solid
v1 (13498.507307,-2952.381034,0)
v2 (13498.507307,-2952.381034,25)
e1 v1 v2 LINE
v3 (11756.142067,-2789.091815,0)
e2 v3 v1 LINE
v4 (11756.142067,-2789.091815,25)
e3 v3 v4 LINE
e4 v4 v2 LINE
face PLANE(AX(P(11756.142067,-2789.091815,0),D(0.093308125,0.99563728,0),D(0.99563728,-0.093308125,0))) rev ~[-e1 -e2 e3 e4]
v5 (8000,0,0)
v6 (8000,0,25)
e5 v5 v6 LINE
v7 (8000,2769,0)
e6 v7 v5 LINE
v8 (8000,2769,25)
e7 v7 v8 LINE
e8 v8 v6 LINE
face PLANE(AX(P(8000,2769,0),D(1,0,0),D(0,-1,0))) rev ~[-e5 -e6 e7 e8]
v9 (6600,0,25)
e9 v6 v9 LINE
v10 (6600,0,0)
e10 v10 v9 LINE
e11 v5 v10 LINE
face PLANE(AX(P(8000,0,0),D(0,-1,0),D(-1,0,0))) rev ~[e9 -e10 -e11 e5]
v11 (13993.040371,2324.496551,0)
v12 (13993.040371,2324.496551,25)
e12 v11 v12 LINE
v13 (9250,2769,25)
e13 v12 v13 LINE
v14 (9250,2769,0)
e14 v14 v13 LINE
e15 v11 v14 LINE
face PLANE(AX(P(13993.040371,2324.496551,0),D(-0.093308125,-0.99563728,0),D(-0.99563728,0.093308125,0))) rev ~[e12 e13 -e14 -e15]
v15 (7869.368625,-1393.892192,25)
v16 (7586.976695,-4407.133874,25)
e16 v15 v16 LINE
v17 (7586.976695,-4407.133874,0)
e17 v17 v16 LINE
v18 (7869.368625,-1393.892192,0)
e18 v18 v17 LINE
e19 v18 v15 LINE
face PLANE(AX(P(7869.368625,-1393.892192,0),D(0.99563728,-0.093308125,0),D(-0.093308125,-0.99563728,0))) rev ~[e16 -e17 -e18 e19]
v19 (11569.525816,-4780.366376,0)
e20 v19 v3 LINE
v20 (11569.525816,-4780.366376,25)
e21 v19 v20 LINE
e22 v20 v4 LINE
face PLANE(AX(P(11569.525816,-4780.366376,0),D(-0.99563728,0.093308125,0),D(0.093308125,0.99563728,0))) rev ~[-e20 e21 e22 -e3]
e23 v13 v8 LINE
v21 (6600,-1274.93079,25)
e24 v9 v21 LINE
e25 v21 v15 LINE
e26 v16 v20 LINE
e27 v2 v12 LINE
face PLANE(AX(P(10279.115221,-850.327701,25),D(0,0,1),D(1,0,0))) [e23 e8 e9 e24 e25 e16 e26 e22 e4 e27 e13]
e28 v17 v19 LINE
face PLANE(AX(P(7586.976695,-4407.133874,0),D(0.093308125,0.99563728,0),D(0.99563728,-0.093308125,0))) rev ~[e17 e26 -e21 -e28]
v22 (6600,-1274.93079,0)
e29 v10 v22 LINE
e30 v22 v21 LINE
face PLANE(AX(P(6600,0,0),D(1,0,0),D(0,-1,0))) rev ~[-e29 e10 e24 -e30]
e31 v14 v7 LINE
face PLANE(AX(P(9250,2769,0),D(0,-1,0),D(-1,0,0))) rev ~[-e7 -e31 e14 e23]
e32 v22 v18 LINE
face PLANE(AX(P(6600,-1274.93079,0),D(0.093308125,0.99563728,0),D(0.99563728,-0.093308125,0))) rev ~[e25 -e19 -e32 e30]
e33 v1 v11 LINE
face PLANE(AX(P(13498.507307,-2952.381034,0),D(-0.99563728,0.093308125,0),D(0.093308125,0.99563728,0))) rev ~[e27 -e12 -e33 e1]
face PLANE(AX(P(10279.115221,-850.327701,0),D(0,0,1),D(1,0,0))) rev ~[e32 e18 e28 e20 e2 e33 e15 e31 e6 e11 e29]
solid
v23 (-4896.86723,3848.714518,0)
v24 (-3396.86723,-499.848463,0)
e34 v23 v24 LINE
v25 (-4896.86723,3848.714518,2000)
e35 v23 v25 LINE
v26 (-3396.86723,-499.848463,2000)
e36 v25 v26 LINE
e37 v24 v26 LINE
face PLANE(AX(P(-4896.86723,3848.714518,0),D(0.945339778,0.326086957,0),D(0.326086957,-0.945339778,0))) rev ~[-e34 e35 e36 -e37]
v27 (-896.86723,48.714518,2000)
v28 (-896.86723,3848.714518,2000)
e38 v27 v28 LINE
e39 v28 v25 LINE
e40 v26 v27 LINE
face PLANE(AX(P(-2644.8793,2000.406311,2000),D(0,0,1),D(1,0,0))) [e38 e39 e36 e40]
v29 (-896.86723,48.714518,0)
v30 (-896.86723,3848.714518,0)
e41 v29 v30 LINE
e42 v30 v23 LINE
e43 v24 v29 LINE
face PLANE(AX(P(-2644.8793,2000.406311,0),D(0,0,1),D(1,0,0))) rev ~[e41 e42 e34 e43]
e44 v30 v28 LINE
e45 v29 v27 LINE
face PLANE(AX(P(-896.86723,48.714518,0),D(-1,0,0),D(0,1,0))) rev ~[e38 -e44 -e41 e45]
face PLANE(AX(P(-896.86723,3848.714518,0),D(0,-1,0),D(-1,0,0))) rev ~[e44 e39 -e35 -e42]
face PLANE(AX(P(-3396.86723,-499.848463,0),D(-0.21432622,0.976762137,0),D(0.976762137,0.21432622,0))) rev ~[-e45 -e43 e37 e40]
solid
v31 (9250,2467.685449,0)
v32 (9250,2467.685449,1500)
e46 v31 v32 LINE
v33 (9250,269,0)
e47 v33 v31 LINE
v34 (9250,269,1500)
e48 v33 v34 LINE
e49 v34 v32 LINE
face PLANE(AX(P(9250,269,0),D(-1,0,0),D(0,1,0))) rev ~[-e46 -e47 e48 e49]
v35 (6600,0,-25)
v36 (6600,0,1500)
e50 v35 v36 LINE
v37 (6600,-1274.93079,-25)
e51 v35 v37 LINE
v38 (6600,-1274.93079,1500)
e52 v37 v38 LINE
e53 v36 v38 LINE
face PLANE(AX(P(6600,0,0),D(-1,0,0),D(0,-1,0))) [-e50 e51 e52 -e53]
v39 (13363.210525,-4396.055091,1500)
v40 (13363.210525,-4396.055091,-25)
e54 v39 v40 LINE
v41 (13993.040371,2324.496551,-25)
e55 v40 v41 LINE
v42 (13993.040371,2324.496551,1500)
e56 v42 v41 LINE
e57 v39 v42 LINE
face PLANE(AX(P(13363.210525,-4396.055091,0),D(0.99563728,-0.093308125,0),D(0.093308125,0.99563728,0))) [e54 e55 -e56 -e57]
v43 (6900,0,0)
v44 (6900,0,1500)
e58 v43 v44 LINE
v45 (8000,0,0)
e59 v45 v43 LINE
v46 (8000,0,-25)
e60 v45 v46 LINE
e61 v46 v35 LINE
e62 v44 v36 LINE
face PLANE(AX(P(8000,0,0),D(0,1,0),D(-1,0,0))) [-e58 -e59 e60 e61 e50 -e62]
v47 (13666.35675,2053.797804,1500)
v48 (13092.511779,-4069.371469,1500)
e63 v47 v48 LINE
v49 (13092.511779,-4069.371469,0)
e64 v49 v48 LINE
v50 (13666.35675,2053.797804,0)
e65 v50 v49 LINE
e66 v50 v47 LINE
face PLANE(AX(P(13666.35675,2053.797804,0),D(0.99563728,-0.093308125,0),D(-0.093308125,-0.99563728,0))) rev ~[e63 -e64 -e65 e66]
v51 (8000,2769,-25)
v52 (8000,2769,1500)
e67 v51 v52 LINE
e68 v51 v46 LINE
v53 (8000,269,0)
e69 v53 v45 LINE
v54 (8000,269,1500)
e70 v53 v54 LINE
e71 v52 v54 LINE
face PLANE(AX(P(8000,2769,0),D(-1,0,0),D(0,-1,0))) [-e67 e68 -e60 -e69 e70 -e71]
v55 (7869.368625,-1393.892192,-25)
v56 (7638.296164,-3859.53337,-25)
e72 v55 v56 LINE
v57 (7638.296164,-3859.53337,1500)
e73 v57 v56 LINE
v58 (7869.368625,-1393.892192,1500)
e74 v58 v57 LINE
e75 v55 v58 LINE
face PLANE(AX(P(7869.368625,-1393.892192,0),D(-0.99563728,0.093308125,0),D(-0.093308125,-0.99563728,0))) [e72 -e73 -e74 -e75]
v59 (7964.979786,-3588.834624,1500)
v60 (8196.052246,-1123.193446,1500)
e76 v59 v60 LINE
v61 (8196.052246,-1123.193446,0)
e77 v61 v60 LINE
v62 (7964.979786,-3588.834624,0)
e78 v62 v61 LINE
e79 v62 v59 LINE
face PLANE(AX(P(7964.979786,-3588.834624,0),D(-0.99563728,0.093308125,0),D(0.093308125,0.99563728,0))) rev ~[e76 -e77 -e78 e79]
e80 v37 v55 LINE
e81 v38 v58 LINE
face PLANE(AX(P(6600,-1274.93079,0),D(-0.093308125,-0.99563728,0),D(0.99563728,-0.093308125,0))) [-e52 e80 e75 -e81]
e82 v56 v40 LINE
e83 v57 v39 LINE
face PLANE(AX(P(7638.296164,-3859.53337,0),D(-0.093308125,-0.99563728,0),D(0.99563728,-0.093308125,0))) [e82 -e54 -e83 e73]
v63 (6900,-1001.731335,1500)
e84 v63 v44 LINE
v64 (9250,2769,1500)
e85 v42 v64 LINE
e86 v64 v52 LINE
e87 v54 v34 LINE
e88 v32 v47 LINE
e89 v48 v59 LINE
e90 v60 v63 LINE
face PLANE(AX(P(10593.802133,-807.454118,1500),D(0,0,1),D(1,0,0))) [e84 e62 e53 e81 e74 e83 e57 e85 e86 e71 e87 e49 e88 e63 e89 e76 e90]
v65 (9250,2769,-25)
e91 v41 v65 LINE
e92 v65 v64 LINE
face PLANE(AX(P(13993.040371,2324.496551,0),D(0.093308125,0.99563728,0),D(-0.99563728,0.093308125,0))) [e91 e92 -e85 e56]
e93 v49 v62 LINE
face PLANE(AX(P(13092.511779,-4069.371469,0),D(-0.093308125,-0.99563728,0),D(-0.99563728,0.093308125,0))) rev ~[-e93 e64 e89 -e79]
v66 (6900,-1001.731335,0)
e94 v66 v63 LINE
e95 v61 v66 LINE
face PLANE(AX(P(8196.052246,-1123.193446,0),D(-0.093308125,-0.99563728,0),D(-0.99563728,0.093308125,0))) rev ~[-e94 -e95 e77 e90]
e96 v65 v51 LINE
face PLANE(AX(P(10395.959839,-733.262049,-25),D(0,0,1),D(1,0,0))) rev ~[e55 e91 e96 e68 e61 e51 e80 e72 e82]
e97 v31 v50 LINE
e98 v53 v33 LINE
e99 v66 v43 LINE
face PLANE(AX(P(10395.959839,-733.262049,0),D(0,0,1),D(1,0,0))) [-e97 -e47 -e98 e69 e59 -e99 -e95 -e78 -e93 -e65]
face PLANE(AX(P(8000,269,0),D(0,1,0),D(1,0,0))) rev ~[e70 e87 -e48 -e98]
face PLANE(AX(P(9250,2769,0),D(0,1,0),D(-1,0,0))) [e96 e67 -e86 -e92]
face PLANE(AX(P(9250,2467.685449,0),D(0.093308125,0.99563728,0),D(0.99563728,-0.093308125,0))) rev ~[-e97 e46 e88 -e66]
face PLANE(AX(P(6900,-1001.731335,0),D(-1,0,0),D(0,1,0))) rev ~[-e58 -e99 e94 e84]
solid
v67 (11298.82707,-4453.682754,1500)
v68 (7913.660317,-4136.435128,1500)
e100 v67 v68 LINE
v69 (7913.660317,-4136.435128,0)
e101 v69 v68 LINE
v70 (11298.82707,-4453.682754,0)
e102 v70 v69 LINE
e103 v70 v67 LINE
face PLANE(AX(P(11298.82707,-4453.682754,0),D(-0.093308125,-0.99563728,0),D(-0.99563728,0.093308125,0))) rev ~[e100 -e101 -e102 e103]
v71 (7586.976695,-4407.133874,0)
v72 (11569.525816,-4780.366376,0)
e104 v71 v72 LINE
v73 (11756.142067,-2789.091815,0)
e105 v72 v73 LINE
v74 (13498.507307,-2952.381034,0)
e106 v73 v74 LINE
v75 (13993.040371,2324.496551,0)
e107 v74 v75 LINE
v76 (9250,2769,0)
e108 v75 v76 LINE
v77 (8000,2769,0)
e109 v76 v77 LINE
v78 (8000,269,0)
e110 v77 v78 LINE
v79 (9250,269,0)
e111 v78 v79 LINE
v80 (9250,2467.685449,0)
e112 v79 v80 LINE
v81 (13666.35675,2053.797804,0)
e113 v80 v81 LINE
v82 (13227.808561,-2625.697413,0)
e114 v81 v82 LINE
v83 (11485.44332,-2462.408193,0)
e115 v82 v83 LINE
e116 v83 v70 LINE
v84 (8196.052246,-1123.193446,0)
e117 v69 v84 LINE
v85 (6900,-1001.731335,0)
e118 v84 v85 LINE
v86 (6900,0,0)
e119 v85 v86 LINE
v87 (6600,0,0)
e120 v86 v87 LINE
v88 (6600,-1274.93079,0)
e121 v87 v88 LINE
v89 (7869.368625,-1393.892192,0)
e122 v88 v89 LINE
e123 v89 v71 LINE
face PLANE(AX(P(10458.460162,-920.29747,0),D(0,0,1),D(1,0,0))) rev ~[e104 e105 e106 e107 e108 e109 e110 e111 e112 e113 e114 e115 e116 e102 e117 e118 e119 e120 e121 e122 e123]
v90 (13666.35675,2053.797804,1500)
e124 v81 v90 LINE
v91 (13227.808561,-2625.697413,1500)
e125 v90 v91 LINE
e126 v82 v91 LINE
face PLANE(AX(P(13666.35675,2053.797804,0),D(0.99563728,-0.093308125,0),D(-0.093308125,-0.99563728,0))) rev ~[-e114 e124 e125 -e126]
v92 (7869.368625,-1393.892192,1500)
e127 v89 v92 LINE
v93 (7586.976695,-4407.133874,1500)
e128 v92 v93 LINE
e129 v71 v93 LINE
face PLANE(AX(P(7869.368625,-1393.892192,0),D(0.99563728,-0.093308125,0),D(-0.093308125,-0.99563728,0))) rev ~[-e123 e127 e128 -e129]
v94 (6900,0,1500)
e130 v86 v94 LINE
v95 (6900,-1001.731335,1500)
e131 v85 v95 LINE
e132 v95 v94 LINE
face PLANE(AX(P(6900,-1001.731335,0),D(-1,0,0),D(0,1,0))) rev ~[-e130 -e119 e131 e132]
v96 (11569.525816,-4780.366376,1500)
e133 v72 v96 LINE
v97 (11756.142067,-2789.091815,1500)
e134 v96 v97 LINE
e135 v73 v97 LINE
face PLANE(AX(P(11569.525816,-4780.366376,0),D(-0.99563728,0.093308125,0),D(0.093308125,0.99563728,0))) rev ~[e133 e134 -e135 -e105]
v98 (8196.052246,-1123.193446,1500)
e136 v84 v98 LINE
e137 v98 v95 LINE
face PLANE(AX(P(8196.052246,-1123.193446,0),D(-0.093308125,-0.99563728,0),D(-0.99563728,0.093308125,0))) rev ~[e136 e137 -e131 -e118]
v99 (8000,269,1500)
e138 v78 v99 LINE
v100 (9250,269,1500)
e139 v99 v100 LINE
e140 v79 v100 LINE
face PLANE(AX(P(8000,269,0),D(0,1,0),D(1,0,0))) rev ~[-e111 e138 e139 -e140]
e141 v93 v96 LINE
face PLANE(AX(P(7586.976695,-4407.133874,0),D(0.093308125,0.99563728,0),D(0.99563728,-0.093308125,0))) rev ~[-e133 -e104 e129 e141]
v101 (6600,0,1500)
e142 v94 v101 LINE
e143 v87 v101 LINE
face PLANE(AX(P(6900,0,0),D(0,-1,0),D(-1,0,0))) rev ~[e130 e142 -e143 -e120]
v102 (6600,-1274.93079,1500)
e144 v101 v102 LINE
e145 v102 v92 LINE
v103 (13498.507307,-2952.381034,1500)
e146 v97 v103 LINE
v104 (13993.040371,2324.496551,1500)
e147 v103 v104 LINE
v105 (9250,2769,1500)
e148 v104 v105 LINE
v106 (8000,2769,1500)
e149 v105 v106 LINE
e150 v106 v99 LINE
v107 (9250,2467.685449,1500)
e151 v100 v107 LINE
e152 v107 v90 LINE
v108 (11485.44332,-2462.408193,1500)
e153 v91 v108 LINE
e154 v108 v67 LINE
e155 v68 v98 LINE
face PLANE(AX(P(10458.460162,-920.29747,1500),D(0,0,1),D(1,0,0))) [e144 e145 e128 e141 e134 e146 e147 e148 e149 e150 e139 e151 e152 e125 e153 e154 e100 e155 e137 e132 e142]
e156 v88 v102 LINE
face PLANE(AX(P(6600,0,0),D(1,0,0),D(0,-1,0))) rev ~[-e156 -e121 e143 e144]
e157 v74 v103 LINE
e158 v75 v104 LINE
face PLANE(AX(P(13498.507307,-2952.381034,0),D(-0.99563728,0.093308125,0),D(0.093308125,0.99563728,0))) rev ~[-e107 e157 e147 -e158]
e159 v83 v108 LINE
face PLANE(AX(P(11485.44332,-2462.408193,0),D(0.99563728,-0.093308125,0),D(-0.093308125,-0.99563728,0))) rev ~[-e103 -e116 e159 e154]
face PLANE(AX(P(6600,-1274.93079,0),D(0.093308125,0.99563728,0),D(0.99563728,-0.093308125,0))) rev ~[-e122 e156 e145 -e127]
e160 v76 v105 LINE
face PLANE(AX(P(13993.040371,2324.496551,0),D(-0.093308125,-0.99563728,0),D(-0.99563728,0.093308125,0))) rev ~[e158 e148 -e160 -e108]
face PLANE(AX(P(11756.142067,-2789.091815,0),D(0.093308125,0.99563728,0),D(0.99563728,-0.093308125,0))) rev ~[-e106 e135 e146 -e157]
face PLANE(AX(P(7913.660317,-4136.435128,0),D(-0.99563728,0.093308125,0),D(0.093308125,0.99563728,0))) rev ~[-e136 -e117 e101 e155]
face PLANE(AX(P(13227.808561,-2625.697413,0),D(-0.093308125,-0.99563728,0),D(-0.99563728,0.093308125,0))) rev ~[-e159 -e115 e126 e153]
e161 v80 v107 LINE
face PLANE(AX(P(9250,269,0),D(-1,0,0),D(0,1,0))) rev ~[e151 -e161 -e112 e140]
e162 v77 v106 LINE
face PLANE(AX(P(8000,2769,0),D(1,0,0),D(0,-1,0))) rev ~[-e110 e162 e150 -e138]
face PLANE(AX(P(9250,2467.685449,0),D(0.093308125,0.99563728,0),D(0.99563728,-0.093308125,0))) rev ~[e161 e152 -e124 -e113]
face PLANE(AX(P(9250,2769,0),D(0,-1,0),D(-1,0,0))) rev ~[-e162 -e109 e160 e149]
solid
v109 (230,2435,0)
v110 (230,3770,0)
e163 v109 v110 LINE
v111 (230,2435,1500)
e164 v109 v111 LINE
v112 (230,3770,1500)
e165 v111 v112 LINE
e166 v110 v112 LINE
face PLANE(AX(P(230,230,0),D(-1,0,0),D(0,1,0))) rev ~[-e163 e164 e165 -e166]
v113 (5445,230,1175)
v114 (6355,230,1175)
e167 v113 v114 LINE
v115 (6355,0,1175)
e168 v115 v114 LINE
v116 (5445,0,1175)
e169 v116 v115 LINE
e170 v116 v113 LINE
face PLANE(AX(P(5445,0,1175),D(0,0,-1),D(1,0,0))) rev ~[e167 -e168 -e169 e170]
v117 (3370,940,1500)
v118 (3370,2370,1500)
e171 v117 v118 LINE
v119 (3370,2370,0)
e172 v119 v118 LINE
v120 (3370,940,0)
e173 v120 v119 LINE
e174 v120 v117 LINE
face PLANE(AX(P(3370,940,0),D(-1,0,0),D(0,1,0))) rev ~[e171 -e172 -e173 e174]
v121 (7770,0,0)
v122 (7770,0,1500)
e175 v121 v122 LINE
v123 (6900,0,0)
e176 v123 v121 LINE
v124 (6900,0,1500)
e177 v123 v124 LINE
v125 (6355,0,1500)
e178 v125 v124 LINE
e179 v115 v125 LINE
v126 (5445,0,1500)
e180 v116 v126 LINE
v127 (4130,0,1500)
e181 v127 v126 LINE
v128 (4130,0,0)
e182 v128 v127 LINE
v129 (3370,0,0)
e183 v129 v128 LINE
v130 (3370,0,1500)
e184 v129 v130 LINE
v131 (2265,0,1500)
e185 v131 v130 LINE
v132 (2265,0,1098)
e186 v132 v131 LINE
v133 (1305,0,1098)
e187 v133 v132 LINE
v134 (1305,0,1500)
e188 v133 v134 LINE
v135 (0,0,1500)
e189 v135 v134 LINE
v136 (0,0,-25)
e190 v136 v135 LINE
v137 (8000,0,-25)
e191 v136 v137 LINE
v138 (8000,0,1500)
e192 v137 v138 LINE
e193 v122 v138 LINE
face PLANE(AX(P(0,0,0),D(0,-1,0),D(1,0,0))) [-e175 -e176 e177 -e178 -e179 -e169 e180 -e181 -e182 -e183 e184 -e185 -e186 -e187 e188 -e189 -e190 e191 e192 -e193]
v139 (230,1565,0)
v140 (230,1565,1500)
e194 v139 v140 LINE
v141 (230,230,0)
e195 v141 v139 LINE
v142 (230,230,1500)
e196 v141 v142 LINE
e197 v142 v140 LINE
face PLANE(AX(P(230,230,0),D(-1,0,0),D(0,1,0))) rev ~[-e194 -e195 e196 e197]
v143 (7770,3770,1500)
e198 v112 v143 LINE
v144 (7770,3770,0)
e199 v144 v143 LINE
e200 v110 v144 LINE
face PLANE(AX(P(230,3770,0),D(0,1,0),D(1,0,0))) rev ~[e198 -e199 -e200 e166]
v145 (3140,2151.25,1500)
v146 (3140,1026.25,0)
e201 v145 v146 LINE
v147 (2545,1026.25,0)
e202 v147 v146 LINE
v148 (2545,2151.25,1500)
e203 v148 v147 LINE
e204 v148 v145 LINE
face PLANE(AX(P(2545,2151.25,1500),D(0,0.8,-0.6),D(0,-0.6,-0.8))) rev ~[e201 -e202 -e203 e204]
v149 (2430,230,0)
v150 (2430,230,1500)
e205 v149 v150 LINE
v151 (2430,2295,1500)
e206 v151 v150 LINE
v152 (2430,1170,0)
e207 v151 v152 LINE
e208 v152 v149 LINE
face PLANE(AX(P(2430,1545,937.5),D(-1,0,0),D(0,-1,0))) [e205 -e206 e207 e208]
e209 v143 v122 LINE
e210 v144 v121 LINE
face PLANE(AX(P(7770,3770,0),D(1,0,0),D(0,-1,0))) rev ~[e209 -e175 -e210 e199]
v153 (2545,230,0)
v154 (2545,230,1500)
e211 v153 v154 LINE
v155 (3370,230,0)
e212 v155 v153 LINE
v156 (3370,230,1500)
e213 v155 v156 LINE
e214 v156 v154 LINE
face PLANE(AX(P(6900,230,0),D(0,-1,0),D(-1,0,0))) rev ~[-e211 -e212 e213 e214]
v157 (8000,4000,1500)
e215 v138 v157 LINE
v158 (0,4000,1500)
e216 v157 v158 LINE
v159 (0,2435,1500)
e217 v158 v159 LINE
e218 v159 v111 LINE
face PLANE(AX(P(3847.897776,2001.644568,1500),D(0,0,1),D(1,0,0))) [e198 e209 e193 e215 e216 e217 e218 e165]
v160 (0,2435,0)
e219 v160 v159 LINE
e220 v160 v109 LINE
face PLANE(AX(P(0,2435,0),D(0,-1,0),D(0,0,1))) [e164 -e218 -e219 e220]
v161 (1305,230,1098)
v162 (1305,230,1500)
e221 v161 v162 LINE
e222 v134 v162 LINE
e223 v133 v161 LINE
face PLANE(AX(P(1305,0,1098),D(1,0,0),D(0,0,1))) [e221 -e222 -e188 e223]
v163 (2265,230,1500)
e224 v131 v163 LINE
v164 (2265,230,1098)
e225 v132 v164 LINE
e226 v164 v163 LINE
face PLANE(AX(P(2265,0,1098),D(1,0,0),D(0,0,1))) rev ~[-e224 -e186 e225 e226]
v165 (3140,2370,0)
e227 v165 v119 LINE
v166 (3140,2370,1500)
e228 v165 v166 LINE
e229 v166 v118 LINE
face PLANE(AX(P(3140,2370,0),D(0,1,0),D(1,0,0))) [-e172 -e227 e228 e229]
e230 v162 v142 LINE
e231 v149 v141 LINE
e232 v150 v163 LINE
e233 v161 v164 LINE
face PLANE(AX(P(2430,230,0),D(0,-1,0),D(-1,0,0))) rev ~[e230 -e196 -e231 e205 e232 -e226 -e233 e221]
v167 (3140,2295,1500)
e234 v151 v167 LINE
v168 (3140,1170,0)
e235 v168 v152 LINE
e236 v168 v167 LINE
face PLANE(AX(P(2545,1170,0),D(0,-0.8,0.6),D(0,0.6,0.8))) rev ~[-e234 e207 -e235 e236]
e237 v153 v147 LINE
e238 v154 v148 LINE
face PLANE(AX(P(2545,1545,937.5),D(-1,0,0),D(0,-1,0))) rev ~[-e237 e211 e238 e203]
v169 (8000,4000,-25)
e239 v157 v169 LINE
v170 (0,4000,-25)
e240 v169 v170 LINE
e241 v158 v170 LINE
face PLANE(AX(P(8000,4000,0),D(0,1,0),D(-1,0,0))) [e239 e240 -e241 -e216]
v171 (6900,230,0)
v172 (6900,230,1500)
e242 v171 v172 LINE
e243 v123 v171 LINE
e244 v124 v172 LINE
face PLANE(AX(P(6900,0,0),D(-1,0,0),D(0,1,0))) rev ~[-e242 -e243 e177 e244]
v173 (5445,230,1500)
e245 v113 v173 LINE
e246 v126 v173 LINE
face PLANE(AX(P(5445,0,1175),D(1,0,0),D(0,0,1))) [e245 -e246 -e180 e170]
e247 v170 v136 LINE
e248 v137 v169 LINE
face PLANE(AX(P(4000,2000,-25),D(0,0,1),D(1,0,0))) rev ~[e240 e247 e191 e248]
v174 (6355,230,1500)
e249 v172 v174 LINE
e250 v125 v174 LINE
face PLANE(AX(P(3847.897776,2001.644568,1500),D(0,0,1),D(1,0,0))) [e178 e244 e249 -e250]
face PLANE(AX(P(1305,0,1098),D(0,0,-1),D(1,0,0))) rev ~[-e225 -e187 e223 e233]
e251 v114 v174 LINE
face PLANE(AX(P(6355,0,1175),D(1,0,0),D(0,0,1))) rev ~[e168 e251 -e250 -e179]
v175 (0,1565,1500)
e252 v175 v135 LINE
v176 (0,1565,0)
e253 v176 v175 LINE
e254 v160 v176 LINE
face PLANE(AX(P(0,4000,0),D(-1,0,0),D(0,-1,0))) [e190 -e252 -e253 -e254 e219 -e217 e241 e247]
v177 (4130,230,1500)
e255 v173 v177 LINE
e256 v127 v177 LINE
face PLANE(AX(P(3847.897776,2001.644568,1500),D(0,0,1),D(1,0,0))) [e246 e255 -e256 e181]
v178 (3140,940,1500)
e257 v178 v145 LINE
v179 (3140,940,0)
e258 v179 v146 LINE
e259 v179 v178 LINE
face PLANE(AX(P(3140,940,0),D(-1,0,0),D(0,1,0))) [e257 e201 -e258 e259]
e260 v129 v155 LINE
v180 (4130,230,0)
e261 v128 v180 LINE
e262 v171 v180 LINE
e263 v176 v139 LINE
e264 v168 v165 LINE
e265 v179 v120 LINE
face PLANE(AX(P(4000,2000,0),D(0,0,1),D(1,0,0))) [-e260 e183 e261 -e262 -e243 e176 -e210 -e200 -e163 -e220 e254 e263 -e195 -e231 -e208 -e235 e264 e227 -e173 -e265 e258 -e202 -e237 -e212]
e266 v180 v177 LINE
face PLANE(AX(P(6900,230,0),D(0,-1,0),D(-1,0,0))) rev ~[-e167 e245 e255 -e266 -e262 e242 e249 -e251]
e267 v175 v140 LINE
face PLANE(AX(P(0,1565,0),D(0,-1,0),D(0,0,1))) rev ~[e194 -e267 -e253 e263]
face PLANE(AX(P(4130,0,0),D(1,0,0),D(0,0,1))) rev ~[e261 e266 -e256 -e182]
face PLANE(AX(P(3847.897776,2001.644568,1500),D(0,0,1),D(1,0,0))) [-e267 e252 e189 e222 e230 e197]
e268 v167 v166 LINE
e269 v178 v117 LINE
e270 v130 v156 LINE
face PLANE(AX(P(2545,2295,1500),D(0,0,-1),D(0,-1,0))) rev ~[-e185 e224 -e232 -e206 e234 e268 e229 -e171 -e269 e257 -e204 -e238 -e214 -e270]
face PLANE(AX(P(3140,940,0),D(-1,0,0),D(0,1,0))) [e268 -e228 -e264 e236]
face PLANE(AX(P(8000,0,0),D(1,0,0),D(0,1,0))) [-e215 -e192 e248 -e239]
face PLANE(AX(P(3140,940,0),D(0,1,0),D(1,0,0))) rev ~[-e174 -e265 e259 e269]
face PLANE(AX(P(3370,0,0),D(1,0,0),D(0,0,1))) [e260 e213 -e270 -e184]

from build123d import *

# Parameters (mm, degrees)
F4_DEPTH  = 1500
F5_DEPTH  = 1500
F3_W      = 230
F3_H      = 1430
F6_W      = 760
F6_H      = 1500
F6_W_2    = 910
F6_H_2    = 325
F6_W_3    = 960
F6_H_3    = 402
F7_DEPTH  = 230
F8_DEPTH  = 25
F10_DEPTH = 25
F12_DEPTH = 115
F14_DEPTH = 595
F15_W     = 870
F15_H     = 1500
F16_DEPTH = 230
F18_DEPTH = 25
F20_DEPTH = 1500
F22_DEPTH = 2000


with BuildPart() as f4:
    # F2 (on Top) → F4 (new body)
    with BuildSketch(Plane.XY):
        Polygon((9250, 269), (9250, 2467.6854490471), (13666.3567495496, 2053.7978043052), (13092.5117789977, -4069.3714690182), (7964.9797858895, -3588.8346237594), (8196.0522462423, -1123.1934458246), (6900, -1001.7313352933), (6900, 0), (6600, 0), (6600, -1274.9307903732), (7869.3686245898, -1393.8921923013), (7638.296164237, -3859.533370236), (13363.2105254744, -4396.0550906707), (13993.040371202, 2324.4965507819), (9250, 2769), (8000, 2769), (8000, 269), align=None)
    extrude(amount=F4_DEPTH)

    # F1 (on Top) → F10 (join)
    with BuildSketch(Plane.XY):
        Polygon((13993.040371202, 2324.4965507819), (9250, 2769), (8000, 2769), (8000, 0), (6600, 0), (6600, -1274.9307903732), (7869.3686245898, -1393.8921923013), (7638.296164237, -3859.533370236), (13363.2105254744, -4396.0550906707), align=None)
    extrude(amount=-F10_DEPTH)


with BuildPart() as f5:
    # F3 (on Top) → F5 (new body)
    with BuildSketch(Plane.XY):
        Polygon((8000, 4000), (0, 4000), (0, 0), (6900, 0), (6900, 230), (2545, 230), (2545, 1170), (2430, 1170), (2430, 230), (230, 230), (230, 3770), (7770, 3770), (7770, 0), (8000, 0), (8000, 269), (8000, 2769), (8000, 3790), align=None)
    extrude(amount=F5_DEPTH)

    # F6 (on face) → F7 (cut, through all)
    with BuildSketch(Plane.XZ):
        with Locations((3750, 750)):
            Rectangle(F6_W, F6_H)
        with Locations((5900, 1337.5)):
            Rectangle(F6_W_2, F6_H_2)
        with Locations((1785, 1299)):
            Rectangle(F6_W_3, F6_H_3)
    extrude(amount=-F7_DEPTH, mode=Mode.SUBTRACT)



with BuildPart() as f5b:
    # F3 (on Top) → F5, piece 2 (new body)
    with BuildSketch(Plane.XY):
        with Locations((3255, 1655)):
            Rectangle(F3_W, F3_H)
    extrude(amount=F5_DEPTH)


with BuildPart() as f5_1:
    add(f5.part)

    add(f5b.part)  # F8 merges F5b
    # F0 (on Top) → F8 (join)
    with BuildSketch(Plane.XY):
        Polygon((0, 4000), (0, 0), (8000, 0), (8000, 269), (8000, 2769), (8000, 3790), (8000, 4000), align=None)
    extrude(amount=-F8_DEPTH)

    # F9: union 

    # F11 (on face) → F12 (join, through all)
    with BuildSketch(Plane(origin=(2430, 0, 0), x_dir=(0, -1, 0), z_dir=(-1, 0, 0))):
        Polygon((-2295, 1500), (-1170, 0), (-1170, 1500), align=None)
    extrude(amount=-F12_DEPTH)

    # F13 (on face) → F14 (join, through all)
    with BuildSketch(Plane.YZ.offset(2545)):
        Polygon((1170, 0), (2295, 1500), (2151.25, 1500), (1026.25, 0), align=None)
    extrude(amount=F14_DEPTH)

    # F15 (on face) → F16 (cut)
    with BuildSketch(Plane(origin=(0, 0, 0), x_dir=(0, -1, 0), z_dir=(-1, 0, 0))):
        with Locations((-2000, 750)):
            Rectangle(F15_W, F15_H)
    extrude(amount=-F16_DEPTH, mode=Mode.SUBTRACT)


with BuildPart() as f18:
    # F17 (on Top) → F18 (new body)
    with BuildSketch(Plane.XY):
        Polygon((13993.0403712021, 2324.4965507819), (9250, 2769), (8000, 2769), (8000, 269), (8000, 0), (6600, 0), (6600, -1274.9307903732), (7869.3686245898, -1393.8921923013), (7586.9766953259, -4407.1338743544), (11569.5258161867, -4780.3663755263), (11756.1420667726, -2789.0918150959), (13498.5073071492, -2952.3810343586), align=None)
    extrude(amount=F18_DEPTH)


with BuildPart() as f20:
    # F19 (on Top) → F20 (new body)
    with BuildSketch(Plane.XY):
        Polygon((6900, -1001.7313352933), (6900, 0), (6600, 0), (6600, -1274.9307903732), (7869.3686245898, -1393.8921923013), (7586.9766953259, -4407.1338743544), (11569.5258161867, -4780.3663755263), (11756.1420667726, -2789.0918150959), (13498.5073071492, -2952.3810343586), (13993.0403712021, 2324.4965507819), (9250, 2769), (8000, 2769), (8000, 269), (9250, 269), (9250, 2467.6854490471), (13666.3567495496, 2053.7978043052), (13227.8085606726, -2625.6974127062), (11485.443320296, -2462.4081934435), (11298.82706971, -4453.6827538739), (7913.6603169784, -4136.4351278777), (8196.0522462423, -1123.1934458246), align=None)
    extrude(amount=F20_DEPTH)


with BuildPart() as f22:
    # F21 (on Top) → F22 (new body)
    with BuildSketch(Plane.XY):
        Polygon((-3396.867229657, -499.8484626007), (-896.867229657, 48.7145184311), (-896.867229657, 3848.7145184311), (-4896.867229657, 3848.7145184311), align=None)
    extrude(amount=F22_DEPTH)


solid = Compound([f4.part, f5_1.part, f18.part, f20.part, f22.part])
